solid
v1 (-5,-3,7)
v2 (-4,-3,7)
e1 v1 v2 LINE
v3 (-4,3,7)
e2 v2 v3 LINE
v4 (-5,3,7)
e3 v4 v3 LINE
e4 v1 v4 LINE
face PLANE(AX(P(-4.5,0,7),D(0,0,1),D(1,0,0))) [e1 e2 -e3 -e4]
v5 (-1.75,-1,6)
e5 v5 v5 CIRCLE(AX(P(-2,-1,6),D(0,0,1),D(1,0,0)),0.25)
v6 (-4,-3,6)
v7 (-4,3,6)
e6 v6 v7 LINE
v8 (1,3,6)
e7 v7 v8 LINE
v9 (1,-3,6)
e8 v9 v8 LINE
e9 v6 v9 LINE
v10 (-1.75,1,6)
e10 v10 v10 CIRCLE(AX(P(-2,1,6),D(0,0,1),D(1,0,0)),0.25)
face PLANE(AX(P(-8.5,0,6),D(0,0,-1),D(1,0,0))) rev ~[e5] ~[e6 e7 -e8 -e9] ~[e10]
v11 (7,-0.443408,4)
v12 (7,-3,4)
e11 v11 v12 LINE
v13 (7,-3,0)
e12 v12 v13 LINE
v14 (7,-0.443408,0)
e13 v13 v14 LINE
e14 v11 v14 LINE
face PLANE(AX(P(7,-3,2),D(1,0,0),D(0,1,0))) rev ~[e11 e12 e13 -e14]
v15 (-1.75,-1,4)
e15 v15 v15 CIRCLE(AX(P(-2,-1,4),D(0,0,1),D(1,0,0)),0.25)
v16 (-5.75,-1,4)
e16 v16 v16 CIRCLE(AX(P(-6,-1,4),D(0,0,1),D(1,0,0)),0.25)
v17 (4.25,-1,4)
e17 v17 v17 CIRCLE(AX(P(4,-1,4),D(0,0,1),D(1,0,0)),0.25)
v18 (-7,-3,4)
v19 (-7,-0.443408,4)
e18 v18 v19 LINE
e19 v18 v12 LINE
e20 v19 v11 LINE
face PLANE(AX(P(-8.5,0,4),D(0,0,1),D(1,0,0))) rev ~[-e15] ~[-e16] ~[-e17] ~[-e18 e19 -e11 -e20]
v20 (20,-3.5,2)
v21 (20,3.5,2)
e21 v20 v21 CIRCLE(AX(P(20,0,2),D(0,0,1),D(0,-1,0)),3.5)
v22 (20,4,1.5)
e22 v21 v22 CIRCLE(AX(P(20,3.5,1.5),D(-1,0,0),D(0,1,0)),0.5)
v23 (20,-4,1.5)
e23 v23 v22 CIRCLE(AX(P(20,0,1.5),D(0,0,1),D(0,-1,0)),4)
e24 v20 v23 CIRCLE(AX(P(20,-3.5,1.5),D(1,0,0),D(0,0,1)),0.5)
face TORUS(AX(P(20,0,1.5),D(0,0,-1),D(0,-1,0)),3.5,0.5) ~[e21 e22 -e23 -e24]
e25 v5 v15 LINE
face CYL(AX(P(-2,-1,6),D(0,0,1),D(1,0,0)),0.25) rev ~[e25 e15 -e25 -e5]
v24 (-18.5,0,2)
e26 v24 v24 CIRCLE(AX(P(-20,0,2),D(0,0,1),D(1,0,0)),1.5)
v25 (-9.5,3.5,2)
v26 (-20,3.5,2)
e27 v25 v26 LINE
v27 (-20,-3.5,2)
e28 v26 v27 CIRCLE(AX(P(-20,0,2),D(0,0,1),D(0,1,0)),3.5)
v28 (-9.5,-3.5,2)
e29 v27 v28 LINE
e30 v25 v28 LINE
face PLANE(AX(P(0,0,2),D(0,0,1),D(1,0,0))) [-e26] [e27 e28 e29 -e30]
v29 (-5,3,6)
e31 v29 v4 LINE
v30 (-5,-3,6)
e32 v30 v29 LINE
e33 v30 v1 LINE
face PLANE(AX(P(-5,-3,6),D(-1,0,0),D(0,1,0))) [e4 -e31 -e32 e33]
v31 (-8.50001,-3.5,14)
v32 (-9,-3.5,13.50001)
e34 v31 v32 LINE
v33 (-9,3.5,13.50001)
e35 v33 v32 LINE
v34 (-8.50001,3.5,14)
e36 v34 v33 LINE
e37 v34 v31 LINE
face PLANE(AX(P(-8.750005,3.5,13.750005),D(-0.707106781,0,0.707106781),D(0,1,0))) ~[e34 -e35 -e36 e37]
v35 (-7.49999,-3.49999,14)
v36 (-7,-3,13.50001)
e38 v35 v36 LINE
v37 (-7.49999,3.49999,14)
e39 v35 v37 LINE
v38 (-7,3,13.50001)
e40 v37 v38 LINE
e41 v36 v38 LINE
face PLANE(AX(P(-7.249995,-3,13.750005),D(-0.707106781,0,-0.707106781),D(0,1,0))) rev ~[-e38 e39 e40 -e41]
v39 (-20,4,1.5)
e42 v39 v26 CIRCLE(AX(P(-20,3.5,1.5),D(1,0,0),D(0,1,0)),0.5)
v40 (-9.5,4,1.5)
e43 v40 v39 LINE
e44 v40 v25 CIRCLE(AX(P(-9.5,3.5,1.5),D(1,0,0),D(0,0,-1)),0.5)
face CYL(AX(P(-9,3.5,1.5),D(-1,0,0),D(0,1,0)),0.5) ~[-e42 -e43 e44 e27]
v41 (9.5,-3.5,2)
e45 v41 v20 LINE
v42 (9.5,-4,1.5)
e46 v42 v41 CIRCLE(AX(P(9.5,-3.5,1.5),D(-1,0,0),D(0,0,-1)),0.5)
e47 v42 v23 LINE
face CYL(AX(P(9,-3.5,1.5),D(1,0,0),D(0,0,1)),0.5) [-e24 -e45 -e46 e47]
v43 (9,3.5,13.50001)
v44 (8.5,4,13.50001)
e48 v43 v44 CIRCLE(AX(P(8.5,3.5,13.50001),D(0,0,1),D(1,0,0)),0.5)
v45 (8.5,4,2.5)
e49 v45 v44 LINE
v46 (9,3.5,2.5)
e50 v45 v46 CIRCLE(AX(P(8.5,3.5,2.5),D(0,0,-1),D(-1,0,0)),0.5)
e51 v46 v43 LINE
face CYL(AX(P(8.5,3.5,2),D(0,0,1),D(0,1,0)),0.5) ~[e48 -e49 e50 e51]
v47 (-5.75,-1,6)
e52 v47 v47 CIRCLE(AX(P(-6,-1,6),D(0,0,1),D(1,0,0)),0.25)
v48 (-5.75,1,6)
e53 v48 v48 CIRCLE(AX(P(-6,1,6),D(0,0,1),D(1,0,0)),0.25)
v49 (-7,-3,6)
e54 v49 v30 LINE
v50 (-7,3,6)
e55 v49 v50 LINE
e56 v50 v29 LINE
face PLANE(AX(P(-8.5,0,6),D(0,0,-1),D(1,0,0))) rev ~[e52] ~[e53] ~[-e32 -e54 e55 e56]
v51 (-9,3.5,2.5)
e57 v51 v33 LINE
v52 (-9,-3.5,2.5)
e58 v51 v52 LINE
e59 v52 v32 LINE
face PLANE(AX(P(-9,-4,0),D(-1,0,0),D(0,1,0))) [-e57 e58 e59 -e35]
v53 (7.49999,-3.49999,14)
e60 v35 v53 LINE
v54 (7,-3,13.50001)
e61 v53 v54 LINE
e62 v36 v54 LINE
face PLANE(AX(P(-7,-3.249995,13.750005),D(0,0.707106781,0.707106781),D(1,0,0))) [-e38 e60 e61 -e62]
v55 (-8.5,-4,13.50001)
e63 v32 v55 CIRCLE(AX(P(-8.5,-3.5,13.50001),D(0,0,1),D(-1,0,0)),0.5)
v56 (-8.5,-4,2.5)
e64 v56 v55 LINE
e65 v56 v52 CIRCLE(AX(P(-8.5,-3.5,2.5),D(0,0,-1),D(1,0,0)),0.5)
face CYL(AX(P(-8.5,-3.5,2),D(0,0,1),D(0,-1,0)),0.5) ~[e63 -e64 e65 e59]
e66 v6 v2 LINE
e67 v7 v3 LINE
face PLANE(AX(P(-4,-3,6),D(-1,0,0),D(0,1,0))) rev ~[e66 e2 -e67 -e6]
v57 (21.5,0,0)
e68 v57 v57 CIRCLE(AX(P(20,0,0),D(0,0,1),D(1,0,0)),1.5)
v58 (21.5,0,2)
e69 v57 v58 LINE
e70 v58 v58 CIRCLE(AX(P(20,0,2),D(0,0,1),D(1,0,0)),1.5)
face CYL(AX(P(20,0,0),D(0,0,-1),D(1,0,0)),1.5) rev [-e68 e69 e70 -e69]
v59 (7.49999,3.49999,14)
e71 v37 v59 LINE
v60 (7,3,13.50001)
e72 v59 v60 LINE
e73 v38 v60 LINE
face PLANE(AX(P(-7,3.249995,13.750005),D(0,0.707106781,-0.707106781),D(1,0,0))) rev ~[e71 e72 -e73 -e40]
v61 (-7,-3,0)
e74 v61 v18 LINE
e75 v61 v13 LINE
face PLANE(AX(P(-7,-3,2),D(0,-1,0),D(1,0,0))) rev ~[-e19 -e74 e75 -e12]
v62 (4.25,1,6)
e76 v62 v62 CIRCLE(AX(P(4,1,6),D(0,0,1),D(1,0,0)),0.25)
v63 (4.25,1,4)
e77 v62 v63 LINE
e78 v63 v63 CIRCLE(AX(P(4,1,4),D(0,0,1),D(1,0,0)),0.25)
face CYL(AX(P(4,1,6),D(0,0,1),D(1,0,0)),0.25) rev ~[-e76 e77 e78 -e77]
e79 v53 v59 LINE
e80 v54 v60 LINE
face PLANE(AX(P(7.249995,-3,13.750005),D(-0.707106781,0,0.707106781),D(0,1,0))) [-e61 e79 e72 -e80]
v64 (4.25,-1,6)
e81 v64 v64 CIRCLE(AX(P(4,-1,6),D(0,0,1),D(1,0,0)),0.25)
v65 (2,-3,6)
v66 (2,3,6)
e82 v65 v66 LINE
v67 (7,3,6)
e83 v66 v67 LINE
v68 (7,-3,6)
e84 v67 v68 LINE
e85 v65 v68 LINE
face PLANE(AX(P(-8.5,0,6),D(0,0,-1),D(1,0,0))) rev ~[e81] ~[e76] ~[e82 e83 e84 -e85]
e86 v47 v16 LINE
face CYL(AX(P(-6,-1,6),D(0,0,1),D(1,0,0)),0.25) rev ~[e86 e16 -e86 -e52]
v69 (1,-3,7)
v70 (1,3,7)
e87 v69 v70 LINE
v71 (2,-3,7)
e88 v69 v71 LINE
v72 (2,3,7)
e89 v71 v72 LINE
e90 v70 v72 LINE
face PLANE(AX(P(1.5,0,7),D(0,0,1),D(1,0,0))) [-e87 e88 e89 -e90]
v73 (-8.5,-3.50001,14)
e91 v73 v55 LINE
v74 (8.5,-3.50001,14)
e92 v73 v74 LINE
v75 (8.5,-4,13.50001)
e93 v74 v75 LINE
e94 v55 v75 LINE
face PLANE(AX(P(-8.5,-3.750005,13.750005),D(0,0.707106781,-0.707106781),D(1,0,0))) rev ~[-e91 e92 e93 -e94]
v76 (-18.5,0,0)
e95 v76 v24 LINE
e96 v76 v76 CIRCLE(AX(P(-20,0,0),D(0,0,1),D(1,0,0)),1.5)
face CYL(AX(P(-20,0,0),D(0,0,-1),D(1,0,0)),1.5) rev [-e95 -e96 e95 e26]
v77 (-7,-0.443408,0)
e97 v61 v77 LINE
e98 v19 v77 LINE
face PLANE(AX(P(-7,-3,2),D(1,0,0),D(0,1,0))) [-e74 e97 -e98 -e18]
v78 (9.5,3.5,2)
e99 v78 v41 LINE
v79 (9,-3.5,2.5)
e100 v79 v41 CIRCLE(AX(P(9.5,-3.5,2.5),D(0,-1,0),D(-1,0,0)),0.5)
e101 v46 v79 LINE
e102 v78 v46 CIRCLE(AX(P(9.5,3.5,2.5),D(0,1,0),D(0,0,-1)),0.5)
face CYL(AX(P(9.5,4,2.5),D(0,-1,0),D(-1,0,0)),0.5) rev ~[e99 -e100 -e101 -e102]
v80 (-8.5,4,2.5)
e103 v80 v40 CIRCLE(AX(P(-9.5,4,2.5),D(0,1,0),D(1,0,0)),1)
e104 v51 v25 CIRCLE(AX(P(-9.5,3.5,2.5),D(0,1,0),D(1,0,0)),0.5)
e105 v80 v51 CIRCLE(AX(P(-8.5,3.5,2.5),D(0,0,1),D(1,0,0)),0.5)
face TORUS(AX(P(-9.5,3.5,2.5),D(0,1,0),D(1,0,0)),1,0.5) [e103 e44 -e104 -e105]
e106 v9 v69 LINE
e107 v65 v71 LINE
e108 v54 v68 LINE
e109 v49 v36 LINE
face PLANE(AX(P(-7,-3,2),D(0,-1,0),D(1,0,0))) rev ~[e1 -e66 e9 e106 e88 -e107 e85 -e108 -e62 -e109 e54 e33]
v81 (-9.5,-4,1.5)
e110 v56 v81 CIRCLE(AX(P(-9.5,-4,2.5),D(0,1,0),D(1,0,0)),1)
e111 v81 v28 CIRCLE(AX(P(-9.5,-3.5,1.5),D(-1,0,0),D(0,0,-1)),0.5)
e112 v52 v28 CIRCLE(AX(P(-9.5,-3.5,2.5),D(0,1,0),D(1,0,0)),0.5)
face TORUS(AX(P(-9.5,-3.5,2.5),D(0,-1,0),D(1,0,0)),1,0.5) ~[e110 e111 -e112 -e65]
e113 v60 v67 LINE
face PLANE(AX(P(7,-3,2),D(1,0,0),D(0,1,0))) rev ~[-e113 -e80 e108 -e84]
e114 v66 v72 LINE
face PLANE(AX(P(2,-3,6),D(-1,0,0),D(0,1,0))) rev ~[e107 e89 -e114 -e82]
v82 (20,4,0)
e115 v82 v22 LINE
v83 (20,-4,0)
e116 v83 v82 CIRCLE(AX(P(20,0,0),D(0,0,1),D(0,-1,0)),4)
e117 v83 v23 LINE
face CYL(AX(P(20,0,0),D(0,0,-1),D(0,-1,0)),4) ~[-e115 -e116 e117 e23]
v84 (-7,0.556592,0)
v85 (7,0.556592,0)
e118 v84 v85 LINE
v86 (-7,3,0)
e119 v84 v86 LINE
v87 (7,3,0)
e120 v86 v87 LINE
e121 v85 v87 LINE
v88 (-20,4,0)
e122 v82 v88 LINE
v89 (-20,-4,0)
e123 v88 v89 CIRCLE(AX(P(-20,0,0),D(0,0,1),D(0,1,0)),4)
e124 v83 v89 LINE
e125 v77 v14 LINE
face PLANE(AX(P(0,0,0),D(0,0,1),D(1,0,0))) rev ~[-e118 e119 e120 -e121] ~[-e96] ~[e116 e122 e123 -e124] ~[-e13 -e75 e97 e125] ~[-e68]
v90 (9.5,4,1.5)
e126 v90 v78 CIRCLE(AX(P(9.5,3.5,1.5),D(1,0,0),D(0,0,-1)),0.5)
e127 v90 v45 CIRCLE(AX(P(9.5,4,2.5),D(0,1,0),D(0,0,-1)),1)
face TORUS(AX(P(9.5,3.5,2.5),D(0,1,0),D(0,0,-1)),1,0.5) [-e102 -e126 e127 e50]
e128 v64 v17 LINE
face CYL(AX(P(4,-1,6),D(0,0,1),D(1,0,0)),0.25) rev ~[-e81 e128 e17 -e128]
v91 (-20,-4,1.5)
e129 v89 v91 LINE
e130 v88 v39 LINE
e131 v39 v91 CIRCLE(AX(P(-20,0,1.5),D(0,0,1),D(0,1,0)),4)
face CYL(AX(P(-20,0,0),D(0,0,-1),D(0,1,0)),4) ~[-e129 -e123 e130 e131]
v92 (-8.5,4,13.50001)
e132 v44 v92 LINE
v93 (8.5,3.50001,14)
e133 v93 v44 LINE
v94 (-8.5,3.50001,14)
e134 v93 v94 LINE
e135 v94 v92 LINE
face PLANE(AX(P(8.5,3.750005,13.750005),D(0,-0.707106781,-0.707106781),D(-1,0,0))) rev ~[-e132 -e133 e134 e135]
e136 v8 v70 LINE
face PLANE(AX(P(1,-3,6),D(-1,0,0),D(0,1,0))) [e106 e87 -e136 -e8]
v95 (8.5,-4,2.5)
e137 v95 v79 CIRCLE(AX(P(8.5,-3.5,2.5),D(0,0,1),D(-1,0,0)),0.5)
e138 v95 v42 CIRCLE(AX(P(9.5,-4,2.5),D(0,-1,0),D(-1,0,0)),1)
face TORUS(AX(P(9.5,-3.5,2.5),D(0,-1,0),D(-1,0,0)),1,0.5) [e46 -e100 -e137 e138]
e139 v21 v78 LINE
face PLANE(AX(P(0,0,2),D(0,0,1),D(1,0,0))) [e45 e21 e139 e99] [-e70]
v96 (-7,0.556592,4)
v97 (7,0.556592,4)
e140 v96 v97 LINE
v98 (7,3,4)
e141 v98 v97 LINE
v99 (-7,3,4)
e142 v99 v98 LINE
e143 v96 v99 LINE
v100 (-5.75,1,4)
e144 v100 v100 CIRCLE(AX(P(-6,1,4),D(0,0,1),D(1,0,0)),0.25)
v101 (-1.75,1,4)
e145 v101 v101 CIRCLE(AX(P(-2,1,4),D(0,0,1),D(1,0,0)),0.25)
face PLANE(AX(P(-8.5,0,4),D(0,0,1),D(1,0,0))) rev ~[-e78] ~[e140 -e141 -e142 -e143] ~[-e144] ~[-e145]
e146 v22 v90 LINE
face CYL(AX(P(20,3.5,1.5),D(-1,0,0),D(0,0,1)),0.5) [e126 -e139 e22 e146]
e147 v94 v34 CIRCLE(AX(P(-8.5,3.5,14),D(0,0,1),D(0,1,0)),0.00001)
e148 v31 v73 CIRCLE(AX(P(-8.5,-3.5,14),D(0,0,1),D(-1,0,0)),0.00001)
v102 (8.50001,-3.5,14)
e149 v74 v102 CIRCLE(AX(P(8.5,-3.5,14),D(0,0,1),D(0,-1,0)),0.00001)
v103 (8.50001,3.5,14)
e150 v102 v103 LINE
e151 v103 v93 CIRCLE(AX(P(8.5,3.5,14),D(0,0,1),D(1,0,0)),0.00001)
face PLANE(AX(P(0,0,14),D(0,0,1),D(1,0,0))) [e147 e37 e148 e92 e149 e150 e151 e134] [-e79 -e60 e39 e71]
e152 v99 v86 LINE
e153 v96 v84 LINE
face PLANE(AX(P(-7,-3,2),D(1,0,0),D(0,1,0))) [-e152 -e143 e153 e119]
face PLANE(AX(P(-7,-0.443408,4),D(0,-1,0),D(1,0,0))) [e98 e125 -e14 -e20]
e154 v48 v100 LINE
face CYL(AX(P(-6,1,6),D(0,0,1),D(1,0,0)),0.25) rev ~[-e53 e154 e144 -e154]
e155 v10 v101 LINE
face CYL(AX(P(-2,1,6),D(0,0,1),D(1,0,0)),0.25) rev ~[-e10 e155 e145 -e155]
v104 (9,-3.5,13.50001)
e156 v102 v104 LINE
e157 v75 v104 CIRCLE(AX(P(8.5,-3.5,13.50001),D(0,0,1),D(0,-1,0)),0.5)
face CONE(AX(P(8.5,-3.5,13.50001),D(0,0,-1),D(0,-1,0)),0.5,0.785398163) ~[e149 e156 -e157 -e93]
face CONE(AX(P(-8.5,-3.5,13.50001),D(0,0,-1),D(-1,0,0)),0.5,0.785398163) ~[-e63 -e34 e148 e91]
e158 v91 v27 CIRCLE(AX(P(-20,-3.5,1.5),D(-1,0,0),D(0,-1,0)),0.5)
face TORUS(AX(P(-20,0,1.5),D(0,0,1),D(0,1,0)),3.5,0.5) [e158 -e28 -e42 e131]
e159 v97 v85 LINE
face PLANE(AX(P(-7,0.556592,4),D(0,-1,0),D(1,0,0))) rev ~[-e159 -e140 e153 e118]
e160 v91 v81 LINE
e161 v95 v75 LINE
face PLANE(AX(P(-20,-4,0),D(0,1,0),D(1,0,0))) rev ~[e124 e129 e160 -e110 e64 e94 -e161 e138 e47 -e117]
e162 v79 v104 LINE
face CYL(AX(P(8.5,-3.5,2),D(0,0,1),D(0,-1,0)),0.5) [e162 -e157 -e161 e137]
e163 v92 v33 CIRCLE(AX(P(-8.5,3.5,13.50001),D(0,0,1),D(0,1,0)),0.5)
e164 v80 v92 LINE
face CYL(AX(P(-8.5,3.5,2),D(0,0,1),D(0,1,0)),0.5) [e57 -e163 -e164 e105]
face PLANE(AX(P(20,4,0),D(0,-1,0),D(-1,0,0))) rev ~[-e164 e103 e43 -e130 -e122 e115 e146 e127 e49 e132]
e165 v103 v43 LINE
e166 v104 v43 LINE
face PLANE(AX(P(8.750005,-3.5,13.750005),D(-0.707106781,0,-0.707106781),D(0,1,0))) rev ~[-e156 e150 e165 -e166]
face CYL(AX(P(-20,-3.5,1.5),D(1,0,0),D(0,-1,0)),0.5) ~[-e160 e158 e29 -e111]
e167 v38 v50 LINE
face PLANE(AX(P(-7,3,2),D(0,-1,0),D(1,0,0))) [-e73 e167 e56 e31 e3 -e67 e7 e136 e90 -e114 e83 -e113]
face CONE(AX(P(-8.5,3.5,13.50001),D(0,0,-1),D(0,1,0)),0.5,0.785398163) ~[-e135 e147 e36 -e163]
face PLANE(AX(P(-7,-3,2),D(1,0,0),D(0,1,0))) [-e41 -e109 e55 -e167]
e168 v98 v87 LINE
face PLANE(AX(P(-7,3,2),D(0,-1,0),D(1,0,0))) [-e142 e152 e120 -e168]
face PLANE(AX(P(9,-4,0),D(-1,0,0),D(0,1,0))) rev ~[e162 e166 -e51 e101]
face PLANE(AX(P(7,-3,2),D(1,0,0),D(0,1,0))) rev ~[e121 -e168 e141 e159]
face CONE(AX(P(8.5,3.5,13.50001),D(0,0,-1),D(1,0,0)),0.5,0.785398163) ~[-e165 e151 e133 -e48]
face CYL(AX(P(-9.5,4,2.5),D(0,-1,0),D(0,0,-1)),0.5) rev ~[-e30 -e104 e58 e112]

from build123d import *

# Parameters (mm, degrees)
F0_R          = 1.5
F1_DEPTH      = 2
F2_W          = 18
F2_H          = 8
F2_W_2        = 14
F2_H_2        = 6
F3_DEPTH      = 14
F4_R          = 0.5
F5_SIZE       = 0.49999
F6_W          = 14
F6_H          = 6
F7_DEPTH      = 2.001
F8_W          = 17
F8_H          = 2
F9_DEPTH      = 3
F9_DEPTH_BACK = 3
F10_W         = 1
F10_H         = 6
F11_DEPTH     = 1
F12_R         = 0.25
F13_DEPTH     = 6.001
F14_W         = 14
F14_H         = 1
F15_DEPTH     = 4


# Not quite as in the source:
# - a fillet or chamfer is up to 0.001 mm smaller than in the source, because OpenCascade refuses the exact size


with BuildPart() as f1:
    # F0 (on Top) → F1 (new body)
    with BuildSketch(Plane.XY):
        with BuildLine():
            Line((20, 4), (0, 4))
            Line((0, 4), (-20, 4))
            ThreePointArc((-20, 4), (-24, 0), (-20, -4))
            Line((-20, -4), (0, -4))
            Line((0, -4), (20, -4))
            ThreePointArc((20, -4), (24, 0), (20, 4))
        make_face()
        with Locations((-20, 0)):
            Circle(F0_R, mode=Mode.SUBTRACT)
        with Locations((20, 0)):
            Circle(F0_R, mode=Mode.SUBTRACT)
    extrude(amount=F1_DEPTH)

    # F2 (on Top) → F3 (join)
    with BuildSketch(Plane.XY):
        Rectangle(F2_W, F2_H)
        Rectangle(F2_W_2, F2_H_2, mode=Mode.SUBTRACT)
    extrude(amount=F3_DEPTH)

    # F4
    f4_edges = [f1.edges().sort_by_distance(p)[0] for p in [
        (9, 0, 2),
        (-9, 0, 2),
        (-9, -4, 8),
        (9, -4, 8),
        (24, 0, 2),
        (14.5, -4, 2),
        (14.5, 4, 2),
        (9, 4, 8),
        (-9, 4, 8),
        (-14.5, -4, 2),
        (-24, 0, 2),
        (-14.5, 4, 2),
    ]]
    fillet(f4_edges, radius=F4_R)

    # F5 (size 0.5 in the source; OpenCascade refuses exactly that, so slightly less here)
    f5_edges = [f1.edges().sort_by_distance(p)[0] for p in [
        (7, 0, 14),
        (0, 3, 14),
        (-7, 0, 14),
        (0, -3, 14),
        (0, -4, 14),
        (0, 4, 14),
        (-8.853553, -3.853553, 14),
        (8.853553, -3.853553, 14),
        (-9, 0, 14),
        (9, 0, 14),
        (-8.853553, 3.853553, 14),
        (8.853553, 3.853553, 14),
    ]]
    chamfer(f5_edges, length=F5_SIZE)

    # F6 (on face) → F7 (cut, through all)
    with BuildSketch(Plane.XY.offset(2)):
        Rectangle(F6_W, F6_H)
    extrude(amount=-F7_DEPTH, mode=Mode.SUBTRACT)

    # F8 (on Front) → F9 (join, two sides)
    with BuildSketch(Plane.XZ) as f9_sk:
        with Locations((0, 5)):
            Rectangle(F8_W, F8_H)
    extrude(amount=-F9_DEPTH)
    extrude(f9_sk.sketch, amount=F9_DEPTH_BACK)

    # F10 (on face) → F11 (join)
    with BuildSketch(Plane.XY.offset(6)):
        with Locations((1.5, 0)):
            Rectangle(F10_W, F10_H)
        with Locations((-4.5, 0)):
            Rectangle(F10_W, F10_H)
    extrude(amount=F11_DEPTH)

    # F12 (on face) → F13 (cut, through all)
    with BuildSketch(Plane.XY.offset(6)):
        with Locations((-2, 1)):
            Circle(F12_R)
        with Locations((-2, -1)):
            Circle(F12_R)
        with Locations((4, 1)):
            Circle(F12_R)
        with Locations((4, -1)):
            Circle(F12_R)
        with Locations((-6, 1)):
            Circle(F12_R)
        with Locations((-6, -1)):
            Circle(F12_R)
    extrude(amount=-F13_DEPTH, mode=Mode.SUBTRACT)

    # F14 (on face) → F15 (join, through all)
    with BuildSketch(Plane(origin=(0, 0, 4), x_dir=(1, 0, 0), z_dir=(0, 0, -1))):
        with Locations((0, -0.056592231)):
            Rectangle(F14_W, F14_H)
    extrude(amount=F15_DEPTH)


solid = f1.part
